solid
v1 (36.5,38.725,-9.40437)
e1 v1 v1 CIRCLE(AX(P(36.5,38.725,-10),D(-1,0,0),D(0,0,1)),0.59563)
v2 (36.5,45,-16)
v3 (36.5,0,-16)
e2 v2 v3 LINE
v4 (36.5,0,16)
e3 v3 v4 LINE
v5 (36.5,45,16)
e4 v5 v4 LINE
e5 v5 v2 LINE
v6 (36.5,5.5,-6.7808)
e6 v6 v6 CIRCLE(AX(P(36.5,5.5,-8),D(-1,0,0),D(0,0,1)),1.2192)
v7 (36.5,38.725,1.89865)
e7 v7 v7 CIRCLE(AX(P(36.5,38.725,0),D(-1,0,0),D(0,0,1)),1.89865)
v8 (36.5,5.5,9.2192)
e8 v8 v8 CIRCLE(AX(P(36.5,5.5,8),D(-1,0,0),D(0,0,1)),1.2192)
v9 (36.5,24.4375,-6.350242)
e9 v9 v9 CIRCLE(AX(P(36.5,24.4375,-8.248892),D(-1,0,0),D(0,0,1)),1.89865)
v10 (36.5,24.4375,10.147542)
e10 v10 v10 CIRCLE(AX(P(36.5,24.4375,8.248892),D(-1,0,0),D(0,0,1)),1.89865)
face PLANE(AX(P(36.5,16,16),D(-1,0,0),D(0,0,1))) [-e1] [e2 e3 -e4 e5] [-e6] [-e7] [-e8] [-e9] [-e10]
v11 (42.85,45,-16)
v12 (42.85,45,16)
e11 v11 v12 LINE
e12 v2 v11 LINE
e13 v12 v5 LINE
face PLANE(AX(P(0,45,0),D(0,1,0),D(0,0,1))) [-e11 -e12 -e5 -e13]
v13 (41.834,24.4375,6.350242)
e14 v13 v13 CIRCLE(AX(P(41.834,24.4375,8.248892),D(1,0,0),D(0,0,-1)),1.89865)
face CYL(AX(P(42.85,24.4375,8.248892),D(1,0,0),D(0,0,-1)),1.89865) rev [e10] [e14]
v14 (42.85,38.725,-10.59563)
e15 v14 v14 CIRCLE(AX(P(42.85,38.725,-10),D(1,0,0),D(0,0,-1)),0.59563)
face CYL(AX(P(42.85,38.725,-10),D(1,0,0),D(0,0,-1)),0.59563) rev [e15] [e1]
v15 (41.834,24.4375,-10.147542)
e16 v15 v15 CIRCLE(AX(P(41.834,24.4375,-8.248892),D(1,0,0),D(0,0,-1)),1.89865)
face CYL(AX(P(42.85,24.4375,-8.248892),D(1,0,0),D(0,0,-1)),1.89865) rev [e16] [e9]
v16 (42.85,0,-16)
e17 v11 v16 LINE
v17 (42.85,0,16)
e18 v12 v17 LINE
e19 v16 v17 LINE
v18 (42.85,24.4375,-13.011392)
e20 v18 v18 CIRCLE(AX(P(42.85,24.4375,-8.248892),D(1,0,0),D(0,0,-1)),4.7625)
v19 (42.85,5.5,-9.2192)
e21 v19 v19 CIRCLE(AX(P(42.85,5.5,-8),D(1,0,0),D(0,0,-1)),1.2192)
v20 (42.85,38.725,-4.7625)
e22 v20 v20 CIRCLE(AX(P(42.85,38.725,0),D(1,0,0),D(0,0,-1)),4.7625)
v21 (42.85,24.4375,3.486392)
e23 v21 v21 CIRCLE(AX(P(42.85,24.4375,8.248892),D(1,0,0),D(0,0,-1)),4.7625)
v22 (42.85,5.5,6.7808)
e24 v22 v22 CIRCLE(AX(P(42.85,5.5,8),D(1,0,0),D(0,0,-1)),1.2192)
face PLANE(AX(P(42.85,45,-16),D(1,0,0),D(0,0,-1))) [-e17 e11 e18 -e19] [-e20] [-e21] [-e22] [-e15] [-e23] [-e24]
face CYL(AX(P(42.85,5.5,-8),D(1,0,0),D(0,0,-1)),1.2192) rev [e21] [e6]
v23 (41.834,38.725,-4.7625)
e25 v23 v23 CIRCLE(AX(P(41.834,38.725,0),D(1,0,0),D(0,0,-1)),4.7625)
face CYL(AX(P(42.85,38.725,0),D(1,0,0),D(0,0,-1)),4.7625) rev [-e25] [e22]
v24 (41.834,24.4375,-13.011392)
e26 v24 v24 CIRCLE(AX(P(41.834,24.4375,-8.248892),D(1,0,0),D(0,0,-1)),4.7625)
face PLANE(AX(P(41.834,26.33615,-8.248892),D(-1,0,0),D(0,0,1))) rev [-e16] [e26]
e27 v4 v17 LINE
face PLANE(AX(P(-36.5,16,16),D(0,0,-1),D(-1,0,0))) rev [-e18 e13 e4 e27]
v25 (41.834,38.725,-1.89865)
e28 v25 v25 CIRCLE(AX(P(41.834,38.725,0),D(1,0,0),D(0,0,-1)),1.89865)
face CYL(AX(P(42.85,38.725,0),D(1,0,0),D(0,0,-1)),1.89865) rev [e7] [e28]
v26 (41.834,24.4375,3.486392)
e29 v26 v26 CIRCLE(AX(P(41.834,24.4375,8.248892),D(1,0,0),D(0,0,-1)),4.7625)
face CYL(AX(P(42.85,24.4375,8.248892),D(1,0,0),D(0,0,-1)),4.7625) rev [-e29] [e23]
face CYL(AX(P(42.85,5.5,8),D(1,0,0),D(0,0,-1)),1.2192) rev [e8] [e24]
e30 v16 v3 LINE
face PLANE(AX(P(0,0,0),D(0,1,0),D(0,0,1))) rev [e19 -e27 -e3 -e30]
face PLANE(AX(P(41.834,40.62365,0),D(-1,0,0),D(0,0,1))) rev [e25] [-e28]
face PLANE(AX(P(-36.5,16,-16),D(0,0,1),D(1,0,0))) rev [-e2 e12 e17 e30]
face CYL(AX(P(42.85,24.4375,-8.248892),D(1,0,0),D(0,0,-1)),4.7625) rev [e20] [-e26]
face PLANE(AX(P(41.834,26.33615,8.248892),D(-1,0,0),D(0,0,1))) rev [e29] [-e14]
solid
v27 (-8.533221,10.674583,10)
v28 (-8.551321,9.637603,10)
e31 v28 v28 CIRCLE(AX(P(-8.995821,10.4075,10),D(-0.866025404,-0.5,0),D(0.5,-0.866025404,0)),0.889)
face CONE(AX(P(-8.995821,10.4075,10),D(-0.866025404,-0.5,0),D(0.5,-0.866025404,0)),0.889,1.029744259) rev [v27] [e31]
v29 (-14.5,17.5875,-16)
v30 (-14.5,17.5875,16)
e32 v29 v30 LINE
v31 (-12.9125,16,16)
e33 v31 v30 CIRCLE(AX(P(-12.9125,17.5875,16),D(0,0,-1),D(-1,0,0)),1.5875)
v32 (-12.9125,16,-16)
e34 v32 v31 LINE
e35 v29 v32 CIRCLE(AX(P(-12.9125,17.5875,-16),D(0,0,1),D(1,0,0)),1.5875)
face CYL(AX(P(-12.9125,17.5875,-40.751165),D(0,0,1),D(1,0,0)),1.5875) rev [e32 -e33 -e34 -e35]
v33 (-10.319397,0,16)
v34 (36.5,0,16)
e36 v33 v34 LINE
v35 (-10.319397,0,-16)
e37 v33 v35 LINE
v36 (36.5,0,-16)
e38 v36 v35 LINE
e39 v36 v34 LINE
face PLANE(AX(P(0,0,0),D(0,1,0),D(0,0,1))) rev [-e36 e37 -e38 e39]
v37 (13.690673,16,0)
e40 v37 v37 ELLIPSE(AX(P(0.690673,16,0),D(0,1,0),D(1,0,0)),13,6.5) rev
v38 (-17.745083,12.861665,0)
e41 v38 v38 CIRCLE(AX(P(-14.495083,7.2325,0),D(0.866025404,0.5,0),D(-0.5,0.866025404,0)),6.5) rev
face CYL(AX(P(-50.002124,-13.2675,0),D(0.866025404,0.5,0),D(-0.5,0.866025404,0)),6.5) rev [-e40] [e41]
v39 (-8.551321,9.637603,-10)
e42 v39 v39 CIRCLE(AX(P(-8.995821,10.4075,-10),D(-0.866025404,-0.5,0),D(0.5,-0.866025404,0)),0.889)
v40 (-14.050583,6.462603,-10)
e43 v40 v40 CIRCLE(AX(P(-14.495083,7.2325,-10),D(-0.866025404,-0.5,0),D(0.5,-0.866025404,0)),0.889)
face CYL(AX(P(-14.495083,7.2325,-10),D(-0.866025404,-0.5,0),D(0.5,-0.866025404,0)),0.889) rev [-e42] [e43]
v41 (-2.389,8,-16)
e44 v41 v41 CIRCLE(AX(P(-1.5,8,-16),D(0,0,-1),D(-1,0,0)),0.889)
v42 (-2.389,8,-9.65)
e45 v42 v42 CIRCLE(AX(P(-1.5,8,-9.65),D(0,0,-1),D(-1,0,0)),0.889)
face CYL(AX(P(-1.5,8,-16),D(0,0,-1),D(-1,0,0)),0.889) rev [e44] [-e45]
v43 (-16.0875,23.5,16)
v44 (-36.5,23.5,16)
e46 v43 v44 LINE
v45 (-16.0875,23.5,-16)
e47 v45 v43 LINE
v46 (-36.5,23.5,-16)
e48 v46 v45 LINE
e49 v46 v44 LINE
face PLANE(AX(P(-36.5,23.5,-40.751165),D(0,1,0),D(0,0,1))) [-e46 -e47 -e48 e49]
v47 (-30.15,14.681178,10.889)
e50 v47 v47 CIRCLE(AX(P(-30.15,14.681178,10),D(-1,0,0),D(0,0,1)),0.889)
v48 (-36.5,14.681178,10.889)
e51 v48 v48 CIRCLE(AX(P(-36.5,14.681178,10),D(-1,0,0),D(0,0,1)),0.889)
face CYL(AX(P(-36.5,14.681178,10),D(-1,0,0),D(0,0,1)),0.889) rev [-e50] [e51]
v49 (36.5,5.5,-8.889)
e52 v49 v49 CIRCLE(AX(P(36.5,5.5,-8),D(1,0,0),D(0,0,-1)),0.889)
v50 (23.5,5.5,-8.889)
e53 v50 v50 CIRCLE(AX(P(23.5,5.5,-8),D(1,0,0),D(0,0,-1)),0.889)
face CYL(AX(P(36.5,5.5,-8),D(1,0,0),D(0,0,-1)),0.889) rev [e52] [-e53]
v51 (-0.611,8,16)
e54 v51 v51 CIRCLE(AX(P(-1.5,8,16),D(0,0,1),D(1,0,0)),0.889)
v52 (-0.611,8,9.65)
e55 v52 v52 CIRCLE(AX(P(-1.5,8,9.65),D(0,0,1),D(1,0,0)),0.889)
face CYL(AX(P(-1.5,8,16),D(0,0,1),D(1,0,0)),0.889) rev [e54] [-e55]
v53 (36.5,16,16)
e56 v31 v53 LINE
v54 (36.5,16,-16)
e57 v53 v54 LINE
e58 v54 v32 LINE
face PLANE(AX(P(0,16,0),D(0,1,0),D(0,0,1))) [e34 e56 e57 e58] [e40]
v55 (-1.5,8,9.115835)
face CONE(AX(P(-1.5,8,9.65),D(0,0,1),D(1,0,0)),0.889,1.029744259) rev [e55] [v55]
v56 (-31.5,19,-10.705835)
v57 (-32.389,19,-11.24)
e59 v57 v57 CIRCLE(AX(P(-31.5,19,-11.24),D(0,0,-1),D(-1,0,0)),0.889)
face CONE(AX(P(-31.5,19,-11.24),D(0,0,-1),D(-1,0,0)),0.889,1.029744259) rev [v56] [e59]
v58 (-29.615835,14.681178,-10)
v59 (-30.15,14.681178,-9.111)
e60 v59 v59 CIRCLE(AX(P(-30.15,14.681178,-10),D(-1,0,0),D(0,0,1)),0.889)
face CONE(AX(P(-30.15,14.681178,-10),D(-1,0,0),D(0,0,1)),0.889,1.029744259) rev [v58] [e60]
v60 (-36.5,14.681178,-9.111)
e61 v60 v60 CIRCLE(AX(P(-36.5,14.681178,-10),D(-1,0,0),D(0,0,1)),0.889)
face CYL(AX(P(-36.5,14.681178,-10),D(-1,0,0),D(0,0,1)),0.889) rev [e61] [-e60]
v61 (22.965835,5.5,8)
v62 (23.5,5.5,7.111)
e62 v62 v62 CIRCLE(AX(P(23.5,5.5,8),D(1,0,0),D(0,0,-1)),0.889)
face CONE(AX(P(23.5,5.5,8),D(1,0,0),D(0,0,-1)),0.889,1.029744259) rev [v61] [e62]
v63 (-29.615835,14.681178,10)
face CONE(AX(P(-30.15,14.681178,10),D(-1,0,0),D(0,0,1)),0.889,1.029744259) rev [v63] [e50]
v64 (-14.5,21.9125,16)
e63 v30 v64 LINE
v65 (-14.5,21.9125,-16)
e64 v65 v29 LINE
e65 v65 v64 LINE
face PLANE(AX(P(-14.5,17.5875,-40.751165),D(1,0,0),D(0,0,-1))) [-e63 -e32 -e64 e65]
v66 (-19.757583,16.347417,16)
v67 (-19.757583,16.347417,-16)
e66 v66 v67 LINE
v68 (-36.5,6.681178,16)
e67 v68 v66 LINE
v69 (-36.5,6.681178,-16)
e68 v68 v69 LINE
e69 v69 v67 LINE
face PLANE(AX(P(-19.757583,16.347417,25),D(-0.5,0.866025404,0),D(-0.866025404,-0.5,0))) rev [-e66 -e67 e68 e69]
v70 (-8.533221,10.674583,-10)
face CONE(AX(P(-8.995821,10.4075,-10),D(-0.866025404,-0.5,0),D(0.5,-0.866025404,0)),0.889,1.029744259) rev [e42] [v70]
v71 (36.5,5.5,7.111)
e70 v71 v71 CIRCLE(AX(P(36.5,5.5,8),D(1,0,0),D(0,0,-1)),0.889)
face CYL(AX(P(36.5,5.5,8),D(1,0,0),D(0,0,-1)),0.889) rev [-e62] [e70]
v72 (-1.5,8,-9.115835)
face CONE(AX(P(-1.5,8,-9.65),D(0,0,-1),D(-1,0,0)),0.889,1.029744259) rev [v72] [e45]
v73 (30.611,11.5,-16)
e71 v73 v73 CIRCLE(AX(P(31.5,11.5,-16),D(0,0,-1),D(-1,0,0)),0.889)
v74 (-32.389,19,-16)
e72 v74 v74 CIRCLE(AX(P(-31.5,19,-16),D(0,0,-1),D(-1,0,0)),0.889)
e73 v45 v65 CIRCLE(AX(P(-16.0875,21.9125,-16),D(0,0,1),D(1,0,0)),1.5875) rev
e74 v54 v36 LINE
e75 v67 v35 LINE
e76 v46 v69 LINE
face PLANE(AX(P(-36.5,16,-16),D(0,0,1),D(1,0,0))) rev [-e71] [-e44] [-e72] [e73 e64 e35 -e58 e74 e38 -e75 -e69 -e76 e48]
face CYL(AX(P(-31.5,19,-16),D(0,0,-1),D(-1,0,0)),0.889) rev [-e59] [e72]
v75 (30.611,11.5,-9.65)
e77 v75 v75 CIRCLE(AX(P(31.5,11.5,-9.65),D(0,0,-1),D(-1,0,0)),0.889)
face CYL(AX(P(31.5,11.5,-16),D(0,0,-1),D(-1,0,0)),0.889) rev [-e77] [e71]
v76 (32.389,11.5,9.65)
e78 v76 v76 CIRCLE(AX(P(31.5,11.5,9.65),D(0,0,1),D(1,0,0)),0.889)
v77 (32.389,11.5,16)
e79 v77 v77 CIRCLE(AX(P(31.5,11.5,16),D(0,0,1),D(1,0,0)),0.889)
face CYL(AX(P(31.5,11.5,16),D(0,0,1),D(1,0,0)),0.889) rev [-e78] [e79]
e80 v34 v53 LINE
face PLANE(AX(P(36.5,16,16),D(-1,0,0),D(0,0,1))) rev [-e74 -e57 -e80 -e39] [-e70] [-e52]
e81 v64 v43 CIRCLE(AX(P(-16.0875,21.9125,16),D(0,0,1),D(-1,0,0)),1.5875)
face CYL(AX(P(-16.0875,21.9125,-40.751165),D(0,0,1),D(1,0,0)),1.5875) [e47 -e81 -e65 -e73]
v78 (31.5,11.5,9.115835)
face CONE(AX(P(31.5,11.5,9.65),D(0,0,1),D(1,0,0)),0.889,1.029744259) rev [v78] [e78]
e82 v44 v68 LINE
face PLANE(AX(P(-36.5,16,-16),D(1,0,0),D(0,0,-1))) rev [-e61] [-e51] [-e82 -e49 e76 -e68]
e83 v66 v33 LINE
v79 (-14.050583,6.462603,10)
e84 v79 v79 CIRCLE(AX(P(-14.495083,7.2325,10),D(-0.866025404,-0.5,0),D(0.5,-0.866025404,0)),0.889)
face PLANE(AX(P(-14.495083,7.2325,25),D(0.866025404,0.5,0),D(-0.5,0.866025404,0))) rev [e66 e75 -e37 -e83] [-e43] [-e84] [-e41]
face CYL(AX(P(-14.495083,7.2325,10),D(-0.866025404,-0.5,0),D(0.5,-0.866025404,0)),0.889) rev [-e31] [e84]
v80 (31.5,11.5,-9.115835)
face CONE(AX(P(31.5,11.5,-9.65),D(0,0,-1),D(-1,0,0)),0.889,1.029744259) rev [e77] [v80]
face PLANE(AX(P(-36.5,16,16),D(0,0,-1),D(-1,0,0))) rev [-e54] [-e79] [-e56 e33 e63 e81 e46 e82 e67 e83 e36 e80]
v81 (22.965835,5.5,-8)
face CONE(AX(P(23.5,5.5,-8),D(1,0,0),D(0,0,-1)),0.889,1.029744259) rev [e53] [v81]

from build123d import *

# Parameters (mm, degrees)
SKETCH1_W                                           = 73
SKETCH1_H                                           = 32
BOSS_EXTRUDE1_DEPTH                                 = 16
BOSS_EXTRUDE4_DEPTH                                 = 32
CUT_EXTRUDE23_DEPTH                                 = 41
SKETCH26_W                                          = 6.35
SKETCH26_H                                          = 32
BOSS_EXTRUDE2_DEPTH                                 = 45
CUT_EXTRUDE2_DEPTH                                  = 41
CUT_EXTRUDE2_DEPTH_BACK                             = 33
SKETCH14_R                                          = 6.5
CUT_EXTRUDE7_REACH                                  = 94.614
SKETCH27_R                                          = 1.595
F_2_56_TAPPED_HOLE1_D                               = 1.778
F_2_56_TAPPED_HOLE1_DEPTH                           = 6.35
F_2_56_TAPPED_HOLE1_TIP                             = 0.53416509
CBORE_FOR_6_BINDING_HEAD_MACHINE_SCREW1_D           = 3.7973
CBORE_FOR_6_BINDING_HEAD_MACHINE_SCREW1_DEPTH       = 46.5
CBORE_FOR_6_BINDING_HEAD_MACHINE_SCREW1_CBORE_D     = 9.525
CBORE_FOR_6_BINDING_HEAD_MACHINE_SCREW1_CBORE_DEPTH = 1.016
CBORE_FOR_6_BINDING_HEAD_MACHINE_SCREW1_TIP         = 1.140824014
F_2_56_TAPPED_HOLE2_D                               = 1.778
F_2_56_TAPPED_HOLE2_DEPTH                           = 6.35
F_2_56_TAPPED_HOLE2_TIP                             = 0.53416509
F_2_56_TAPPED_HOLE3_D                               = 1.778
F_2_56_TAPPED_HOLE3_DEPTH                           = 6.35
F_2_56_TAPPED_HOLE3_TIP                             = 0.53416509
F_2_56_TAPPED_HOLE4_D                               = 1.778
F_2_56_TAPPED_HOLE4_DEPTH                           = 6.35
F_2_56_TAPPED_HOLE4_TIP                             = 0.53416509
F_2_56_TAPPED_HOLE5_D                               = 1.778
F_2_56_TAPPED_HOLE5_DEPTH                           = 4.76
F_2_56_TAPPED_HOLE5_TIP                             = 0.53416509
F_0_80_TAPPED_HOLE1_D                               = 1.19126
F_2_CLEARANCE_HOLE1_AT_2_COUNT                      = 2
F_2_CLEARANCE_HOLE1_AT_2_PITCH                      = 16
F_2_56_TAPPED_HOLE7_AT_2_COUNT                      = 2
F_2_56_TAPPED_HOLE7_AT_2_PITCH                      = 16


# Read off the part's stored shape, not the designer's step: Split1
with BuildPart() as part:
    # Sketch1 → Boss-Extrude1 (new body)
    with BuildSketch(Plane(origin=(0, 0, 0), x_dir=(1, 0, 0), z_dir=(0, 1, 0))):
        Rectangle(SKETCH1_W, SKETCH1_H)
    extrude(amount=BOSS_EXTRUDE1_DEPTH)

    # Sketch78 → Boss-Extrude4 (add)
    with BuildSketch(Plane.XY.offset(16)):
        with BuildLine():
            Line((-14.5, 16), (-12.9125, 16))
            ThreePointArc((-12.9125, 16), (-14.035032015, 16.464967985), (-14.5, 17.5875))
            Line((-14.5, 17.5875), (-14.5, 21.9125))
            ThreePointArc((-14.5, 21.9125), (-14.964967985, 23.035032015), (-16.0875, 23.5))
            Line((-16.0875, 23.5), (-36.5, 23.5))
            Line((-36.5, 23.5), (-36.5, 16))
            Line((-36.5, 16), (-14.5, 16))
        make_face()
    extrude(amount=-BOSS_EXTRUDE4_DEPTH)

    # Sketch79 → Cut-Extrude23 (cut)
    with BuildSketch(Plane(origin=(0, 0, -16), x_dir=(-1, 0, 0), z_dir=(0, 0, -1))):
        Polygon((14.495082625, 7.2325), (19.757582625, 16.347417375), (36.5, 6.681178197), (36.5, 0), (10.319396803, 0), align=None)
    extrude(amount=-CUT_EXTRUDE23_DEPTH, mode=Mode.SUBTRACT)

    # Sketch26 → Boss-Extrude2 (add)
    with BuildSketch(Plane.XZ):
        with Locations((39.675, 0)):
            Rectangle(SKETCH26_W, SKETCH26_H)
    extrude(amount=-BOSS_EXTRUDE2_DEPTH)

    # Sketch14 → Cut-Extrude2 (cut, two sides: drawn at the far end of the back side and taken through both)
    with BuildSketch(Plane(origin=(-13.426065962, 5.380908825, -20), x_dir=(0, 0, 1), z_dir=(-0.8660254037844418, -0.4999999999999945, 0)).offset(-CUT_EXTRUDE2_DEPTH_BACK)):
        with Locations(Location((20, 2.138033327, 0), (0, 0, 90))):
            Circle(SKETCH14_R)
    extrude(amount=CUT_EXTRUDE2_DEPTH + CUT_EXTRUDE2_DEPTH_BACK, mode=Mode.SUBTRACT)

    # Sketch27 → Cut-Extrude7 (cut, up to next)
    with BuildSketch(Plane(origin=(42.85, 0, 0), x_dir=(0, 0, -1), z_dir=(1, 0, 0)), mode=Mode.PRIVATE) as cut_extrude7_sk1:
        with Locations((0, 38.725)):
            Circle(SKETCH27_R)
    cut_extrude7_tool1 = extrude(cut_extrude7_sk1.sketch, amount=-CUT_EXTRUDE7_REACH, mode=Mode.PRIVATE) & part.part
    # Sketch27 → Cut-Extrude7 (cut, up to next)
    with BuildSketch(Plane(origin=(42.85, 0, 0), x_dir=(0, 0, -1), z_dir=(1, 0, 0)), mode=Mode.PRIVATE) as cut_extrude7_sk2:
        with Locations((8.248891971, 24.4375)):
            Circle(SKETCH27_R)
    cut_extrude7_tool2 = extrude(cut_extrude7_sk2.sketch, amount=-CUT_EXTRUDE7_REACH, mode=Mode.PRIVATE) & part.part
    # Sketch27 → Cut-Extrude7 (cut, up to next)
    with BuildSketch(Plane(origin=(42.85, 0, 0), x_dir=(0, 0, -1), z_dir=(1, 0, 0)), mode=Mode.PRIVATE) as cut_extrude7_sk3:
        with Locations((-8.248891971, 24.4375)):
            Circle(SKETCH27_R)
    cut_extrude7_tool3 = extrude(cut_extrude7_sk3.sketch, amount=-CUT_EXTRUDE7_REACH, mode=Mode.PRIVATE) & part.part
    add(cut_extrude7_tool1.solids().sort_by_distance((42.85, 38.725, 0))[0], mode=Mode.SUBTRACT)
    add(cut_extrude7_tool2.solids().sort_by_distance((42.85, 24.4375, -8.248892))[0], mode=Mode.SUBTRACT)
    add(cut_extrude7_tool3.solids().sort_by_distance((42.85, 24.4375, 8.248892))[0], mode=Mode.SUBTRACT)

    # #2-56 Tapped Hole1
    with Locations(Plane.ZY.offset(36.5)):
        with Locations((-10, 14.681178197), (10, 14.681178197)):
            Hole(F_2_56_TAPPED_HOLE1_D / 2, depth=F_2_56_TAPPED_HOLE1_DEPTH)
            with Locations((0, 0, -(F_2_56_TAPPED_HOLE1_DEPTH + F_2_56_TAPPED_HOLE1_TIP / 2))):  # 118° drill point
                Cone(0, F_2_56_TAPPED_HOLE1_D / 2, F_2_56_TAPPED_HOLE1_TIP, mode=Mode.SUBTRACT)

    # CBORE for #6 Binding Head Machine Screw1
    with Locations(Plane(origin=(42.85, 0, 0), x_dir=(0, 0, -1), z_dir=(1, 0, 0))):
        with Locations((0, 38.725), (8.248891971, 24.4375), (-8.248891971, 24.4375)):
            CounterBoreHole(CBORE_FOR_6_BINDING_HEAD_MACHINE_SCREW1_D / 2, CBORE_FOR_6_BINDING_HEAD_MACHINE_SCREW1_CBORE_D / 2, CBORE_FOR_6_BINDING_HEAD_MACHINE_SCREW1_CBORE_DEPTH, depth=CBORE_FOR_6_BINDING_HEAD_MACHINE_SCREW1_DEPTH)
            with Locations((0, 0, -(CBORE_FOR_6_BINDING_HEAD_MACHINE_SCREW1_DEPTH + CBORE_FOR_6_BINDING_HEAD_MACHINE_SCREW1_TIP / 2))):  # 118° drill point
                Cone(0, CBORE_FOR_6_BINDING_HEAD_MACHINE_SCREW1_D / 2, CBORE_FOR_6_BINDING_HEAD_MACHINE_SCREW1_TIP, mode=Mode.SUBTRACT)

    # #2-56 Tapped Hole2
    with Locations(Plane(origin=(0, 0, -16), x_dir=(-1, 0, 0), z_dir=(0, 0, -1))):
        with Locations((-31.5, 11.5), (1.5, 8)):
            Hole(F_2_56_TAPPED_HOLE2_D / 2, depth=F_2_56_TAPPED_HOLE2_DEPTH)
            with Locations((0, 0, -(F_2_56_TAPPED_HOLE2_DEPTH + F_2_56_TAPPED_HOLE2_TIP / 2))):  # 118° drill point
                Cone(0, F_2_56_TAPPED_HOLE2_D / 2, F_2_56_TAPPED_HOLE2_TIP, mode=Mode.SUBTRACT)

    # #2-56 Tapped Hole3
    with Locations(Plane.XY.offset(16)):
        with Locations((-1.5, 8), (31.5, 11.5)):
            Hole(F_2_56_TAPPED_HOLE3_D / 2, depth=F_2_56_TAPPED_HOLE3_DEPTH)
            with Locations((0, 0, -(F_2_56_TAPPED_HOLE3_DEPTH + F_2_56_TAPPED_HOLE3_TIP / 2))):  # 118° drill point
                Cone(0, F_2_56_TAPPED_HOLE3_D / 2, F_2_56_TAPPED_HOLE3_TIP, mode=Mode.SUBTRACT)

    # #2-56 Tapped Hole4
    with Locations(Plane(origin=(-7.739547602, -4.468429892, 0), x_dir=(0, 0, 1), z_dir=(-0.8660254037844419, -0.49999999999999456, 0))):
        with Locations((-10, 13.511070046), (10, 13.511070046), (0, 13.511070046)):
            Hole(F_2_56_TAPPED_HOLE4_D / 2, depth=F_2_56_TAPPED_HOLE4_DEPTH)
            with Locations((0, 0, -(F_2_56_TAPPED_HOLE4_DEPTH + F_2_56_TAPPED_HOLE4_TIP / 2))):  # 118° drill point
                Cone(0, F_2_56_TAPPED_HOLE4_D / 2, F_2_56_TAPPED_HOLE4_TIP, mode=Mode.SUBTRACT)

    # #2-56 Tapped Hole5
    with Locations(Plane(origin=(0, 0, -16), x_dir=(-1, 0, 0), z_dir=(0, 0, -1))):
        with Locations((31.5, 19)):
            Hole(F_2_56_TAPPED_HOLE5_D / 2, depth=F_2_56_TAPPED_HOLE5_DEPTH)
            with Locations((0, 0, -(F_2_56_TAPPED_HOLE5_DEPTH + F_2_56_TAPPED_HOLE5_TIP / 2))):  # 118° drill point
                Cone(0, F_2_56_TAPPED_HOLE5_D / 2, F_2_56_TAPPED_HOLE5_TIP, mode=Mode.SUBTRACT)

    # #0-80 Tapped Hole1 (through all)
    with Locations(Plane(origin=(42.85, 0, 0), x_dir=(0, 0, -1), z_dir=(1, 0, 0))):
        with Locations((10, 38.725)):
            Hole(F_0_80_TAPPED_HOLE1_D / 2)


with BuildPart() as body_2:
    # Split1: the piece on the far side of the plane
    add(part.part)
    split(bisect_by=Plane.YZ.offset(36.5), keep=Keep.BOTTOM)

    # Sketch104 → #2-56 Tapped Hole7 (revolve, cut)
    with BuildSketch(Plane(origin=(36.5, 5.5, 8), x_dir=(0, 0, -1), z_dir=(0, 1, 0))):
        Polygon((0, 0), (0, 13.53416509), (0.889, 13), (0.889, 0), align=None)
    f_2_56_tapped_hole7 = revolve(axis=Axis((42.85, 5.5, 8), (-1, 0, 0)), mode=Mode.SUBTRACT)

    # #2-56 Tapped Hole7 at 2: #2-56 Tapped Hole7 ×2
    with Locations(*[(0, 0, -i * F_2_56_TAPPED_HOLE7_AT_2_PITCH) for i in range(1, F_2_56_TAPPED_HOLE7_AT_2_COUNT)]):
        add(f_2_56_tapped_hole7, mode=Mode.SUBTRACT)


with BuildPart() as part_1:
    add(part.part)

    # Split1
    split(bisect_by=Plane.YZ.offset(36.5), keep=Keep.TOP)

    # Sketch102 → #2 Clearance Hole1 (revolve, cut)
    with BuildSketch(Plane(origin=(42.85, 5.5, 8), x_dir=(0, 0, -1), z_dir=(0, 1, 0))):
        Polygon((0, 0), (0, 21.052569267), (1.2192, 20.32), (1.2192, 0), align=None)
    f_2_clearance_hole1 = revolve(axis=Axis((49.2, 5.5, 8), (-1, 0, 0)), mode=Mode.SUBTRACT)

    # #2 Clearance Hole1 at 2: #2 Clearance Hole1 ×2
    with Locations(*[(0, 0, -i * F_2_CLEARANCE_HOLE1_AT_2_PITCH) for i in range(1, F_2_CLEARANCE_HOLE1_AT_2_COUNT)]):
        add(f_2_clearance_hole1, mode=Mode.SUBTRACT)


solid = Compound([body_2.part, part_1.part])
